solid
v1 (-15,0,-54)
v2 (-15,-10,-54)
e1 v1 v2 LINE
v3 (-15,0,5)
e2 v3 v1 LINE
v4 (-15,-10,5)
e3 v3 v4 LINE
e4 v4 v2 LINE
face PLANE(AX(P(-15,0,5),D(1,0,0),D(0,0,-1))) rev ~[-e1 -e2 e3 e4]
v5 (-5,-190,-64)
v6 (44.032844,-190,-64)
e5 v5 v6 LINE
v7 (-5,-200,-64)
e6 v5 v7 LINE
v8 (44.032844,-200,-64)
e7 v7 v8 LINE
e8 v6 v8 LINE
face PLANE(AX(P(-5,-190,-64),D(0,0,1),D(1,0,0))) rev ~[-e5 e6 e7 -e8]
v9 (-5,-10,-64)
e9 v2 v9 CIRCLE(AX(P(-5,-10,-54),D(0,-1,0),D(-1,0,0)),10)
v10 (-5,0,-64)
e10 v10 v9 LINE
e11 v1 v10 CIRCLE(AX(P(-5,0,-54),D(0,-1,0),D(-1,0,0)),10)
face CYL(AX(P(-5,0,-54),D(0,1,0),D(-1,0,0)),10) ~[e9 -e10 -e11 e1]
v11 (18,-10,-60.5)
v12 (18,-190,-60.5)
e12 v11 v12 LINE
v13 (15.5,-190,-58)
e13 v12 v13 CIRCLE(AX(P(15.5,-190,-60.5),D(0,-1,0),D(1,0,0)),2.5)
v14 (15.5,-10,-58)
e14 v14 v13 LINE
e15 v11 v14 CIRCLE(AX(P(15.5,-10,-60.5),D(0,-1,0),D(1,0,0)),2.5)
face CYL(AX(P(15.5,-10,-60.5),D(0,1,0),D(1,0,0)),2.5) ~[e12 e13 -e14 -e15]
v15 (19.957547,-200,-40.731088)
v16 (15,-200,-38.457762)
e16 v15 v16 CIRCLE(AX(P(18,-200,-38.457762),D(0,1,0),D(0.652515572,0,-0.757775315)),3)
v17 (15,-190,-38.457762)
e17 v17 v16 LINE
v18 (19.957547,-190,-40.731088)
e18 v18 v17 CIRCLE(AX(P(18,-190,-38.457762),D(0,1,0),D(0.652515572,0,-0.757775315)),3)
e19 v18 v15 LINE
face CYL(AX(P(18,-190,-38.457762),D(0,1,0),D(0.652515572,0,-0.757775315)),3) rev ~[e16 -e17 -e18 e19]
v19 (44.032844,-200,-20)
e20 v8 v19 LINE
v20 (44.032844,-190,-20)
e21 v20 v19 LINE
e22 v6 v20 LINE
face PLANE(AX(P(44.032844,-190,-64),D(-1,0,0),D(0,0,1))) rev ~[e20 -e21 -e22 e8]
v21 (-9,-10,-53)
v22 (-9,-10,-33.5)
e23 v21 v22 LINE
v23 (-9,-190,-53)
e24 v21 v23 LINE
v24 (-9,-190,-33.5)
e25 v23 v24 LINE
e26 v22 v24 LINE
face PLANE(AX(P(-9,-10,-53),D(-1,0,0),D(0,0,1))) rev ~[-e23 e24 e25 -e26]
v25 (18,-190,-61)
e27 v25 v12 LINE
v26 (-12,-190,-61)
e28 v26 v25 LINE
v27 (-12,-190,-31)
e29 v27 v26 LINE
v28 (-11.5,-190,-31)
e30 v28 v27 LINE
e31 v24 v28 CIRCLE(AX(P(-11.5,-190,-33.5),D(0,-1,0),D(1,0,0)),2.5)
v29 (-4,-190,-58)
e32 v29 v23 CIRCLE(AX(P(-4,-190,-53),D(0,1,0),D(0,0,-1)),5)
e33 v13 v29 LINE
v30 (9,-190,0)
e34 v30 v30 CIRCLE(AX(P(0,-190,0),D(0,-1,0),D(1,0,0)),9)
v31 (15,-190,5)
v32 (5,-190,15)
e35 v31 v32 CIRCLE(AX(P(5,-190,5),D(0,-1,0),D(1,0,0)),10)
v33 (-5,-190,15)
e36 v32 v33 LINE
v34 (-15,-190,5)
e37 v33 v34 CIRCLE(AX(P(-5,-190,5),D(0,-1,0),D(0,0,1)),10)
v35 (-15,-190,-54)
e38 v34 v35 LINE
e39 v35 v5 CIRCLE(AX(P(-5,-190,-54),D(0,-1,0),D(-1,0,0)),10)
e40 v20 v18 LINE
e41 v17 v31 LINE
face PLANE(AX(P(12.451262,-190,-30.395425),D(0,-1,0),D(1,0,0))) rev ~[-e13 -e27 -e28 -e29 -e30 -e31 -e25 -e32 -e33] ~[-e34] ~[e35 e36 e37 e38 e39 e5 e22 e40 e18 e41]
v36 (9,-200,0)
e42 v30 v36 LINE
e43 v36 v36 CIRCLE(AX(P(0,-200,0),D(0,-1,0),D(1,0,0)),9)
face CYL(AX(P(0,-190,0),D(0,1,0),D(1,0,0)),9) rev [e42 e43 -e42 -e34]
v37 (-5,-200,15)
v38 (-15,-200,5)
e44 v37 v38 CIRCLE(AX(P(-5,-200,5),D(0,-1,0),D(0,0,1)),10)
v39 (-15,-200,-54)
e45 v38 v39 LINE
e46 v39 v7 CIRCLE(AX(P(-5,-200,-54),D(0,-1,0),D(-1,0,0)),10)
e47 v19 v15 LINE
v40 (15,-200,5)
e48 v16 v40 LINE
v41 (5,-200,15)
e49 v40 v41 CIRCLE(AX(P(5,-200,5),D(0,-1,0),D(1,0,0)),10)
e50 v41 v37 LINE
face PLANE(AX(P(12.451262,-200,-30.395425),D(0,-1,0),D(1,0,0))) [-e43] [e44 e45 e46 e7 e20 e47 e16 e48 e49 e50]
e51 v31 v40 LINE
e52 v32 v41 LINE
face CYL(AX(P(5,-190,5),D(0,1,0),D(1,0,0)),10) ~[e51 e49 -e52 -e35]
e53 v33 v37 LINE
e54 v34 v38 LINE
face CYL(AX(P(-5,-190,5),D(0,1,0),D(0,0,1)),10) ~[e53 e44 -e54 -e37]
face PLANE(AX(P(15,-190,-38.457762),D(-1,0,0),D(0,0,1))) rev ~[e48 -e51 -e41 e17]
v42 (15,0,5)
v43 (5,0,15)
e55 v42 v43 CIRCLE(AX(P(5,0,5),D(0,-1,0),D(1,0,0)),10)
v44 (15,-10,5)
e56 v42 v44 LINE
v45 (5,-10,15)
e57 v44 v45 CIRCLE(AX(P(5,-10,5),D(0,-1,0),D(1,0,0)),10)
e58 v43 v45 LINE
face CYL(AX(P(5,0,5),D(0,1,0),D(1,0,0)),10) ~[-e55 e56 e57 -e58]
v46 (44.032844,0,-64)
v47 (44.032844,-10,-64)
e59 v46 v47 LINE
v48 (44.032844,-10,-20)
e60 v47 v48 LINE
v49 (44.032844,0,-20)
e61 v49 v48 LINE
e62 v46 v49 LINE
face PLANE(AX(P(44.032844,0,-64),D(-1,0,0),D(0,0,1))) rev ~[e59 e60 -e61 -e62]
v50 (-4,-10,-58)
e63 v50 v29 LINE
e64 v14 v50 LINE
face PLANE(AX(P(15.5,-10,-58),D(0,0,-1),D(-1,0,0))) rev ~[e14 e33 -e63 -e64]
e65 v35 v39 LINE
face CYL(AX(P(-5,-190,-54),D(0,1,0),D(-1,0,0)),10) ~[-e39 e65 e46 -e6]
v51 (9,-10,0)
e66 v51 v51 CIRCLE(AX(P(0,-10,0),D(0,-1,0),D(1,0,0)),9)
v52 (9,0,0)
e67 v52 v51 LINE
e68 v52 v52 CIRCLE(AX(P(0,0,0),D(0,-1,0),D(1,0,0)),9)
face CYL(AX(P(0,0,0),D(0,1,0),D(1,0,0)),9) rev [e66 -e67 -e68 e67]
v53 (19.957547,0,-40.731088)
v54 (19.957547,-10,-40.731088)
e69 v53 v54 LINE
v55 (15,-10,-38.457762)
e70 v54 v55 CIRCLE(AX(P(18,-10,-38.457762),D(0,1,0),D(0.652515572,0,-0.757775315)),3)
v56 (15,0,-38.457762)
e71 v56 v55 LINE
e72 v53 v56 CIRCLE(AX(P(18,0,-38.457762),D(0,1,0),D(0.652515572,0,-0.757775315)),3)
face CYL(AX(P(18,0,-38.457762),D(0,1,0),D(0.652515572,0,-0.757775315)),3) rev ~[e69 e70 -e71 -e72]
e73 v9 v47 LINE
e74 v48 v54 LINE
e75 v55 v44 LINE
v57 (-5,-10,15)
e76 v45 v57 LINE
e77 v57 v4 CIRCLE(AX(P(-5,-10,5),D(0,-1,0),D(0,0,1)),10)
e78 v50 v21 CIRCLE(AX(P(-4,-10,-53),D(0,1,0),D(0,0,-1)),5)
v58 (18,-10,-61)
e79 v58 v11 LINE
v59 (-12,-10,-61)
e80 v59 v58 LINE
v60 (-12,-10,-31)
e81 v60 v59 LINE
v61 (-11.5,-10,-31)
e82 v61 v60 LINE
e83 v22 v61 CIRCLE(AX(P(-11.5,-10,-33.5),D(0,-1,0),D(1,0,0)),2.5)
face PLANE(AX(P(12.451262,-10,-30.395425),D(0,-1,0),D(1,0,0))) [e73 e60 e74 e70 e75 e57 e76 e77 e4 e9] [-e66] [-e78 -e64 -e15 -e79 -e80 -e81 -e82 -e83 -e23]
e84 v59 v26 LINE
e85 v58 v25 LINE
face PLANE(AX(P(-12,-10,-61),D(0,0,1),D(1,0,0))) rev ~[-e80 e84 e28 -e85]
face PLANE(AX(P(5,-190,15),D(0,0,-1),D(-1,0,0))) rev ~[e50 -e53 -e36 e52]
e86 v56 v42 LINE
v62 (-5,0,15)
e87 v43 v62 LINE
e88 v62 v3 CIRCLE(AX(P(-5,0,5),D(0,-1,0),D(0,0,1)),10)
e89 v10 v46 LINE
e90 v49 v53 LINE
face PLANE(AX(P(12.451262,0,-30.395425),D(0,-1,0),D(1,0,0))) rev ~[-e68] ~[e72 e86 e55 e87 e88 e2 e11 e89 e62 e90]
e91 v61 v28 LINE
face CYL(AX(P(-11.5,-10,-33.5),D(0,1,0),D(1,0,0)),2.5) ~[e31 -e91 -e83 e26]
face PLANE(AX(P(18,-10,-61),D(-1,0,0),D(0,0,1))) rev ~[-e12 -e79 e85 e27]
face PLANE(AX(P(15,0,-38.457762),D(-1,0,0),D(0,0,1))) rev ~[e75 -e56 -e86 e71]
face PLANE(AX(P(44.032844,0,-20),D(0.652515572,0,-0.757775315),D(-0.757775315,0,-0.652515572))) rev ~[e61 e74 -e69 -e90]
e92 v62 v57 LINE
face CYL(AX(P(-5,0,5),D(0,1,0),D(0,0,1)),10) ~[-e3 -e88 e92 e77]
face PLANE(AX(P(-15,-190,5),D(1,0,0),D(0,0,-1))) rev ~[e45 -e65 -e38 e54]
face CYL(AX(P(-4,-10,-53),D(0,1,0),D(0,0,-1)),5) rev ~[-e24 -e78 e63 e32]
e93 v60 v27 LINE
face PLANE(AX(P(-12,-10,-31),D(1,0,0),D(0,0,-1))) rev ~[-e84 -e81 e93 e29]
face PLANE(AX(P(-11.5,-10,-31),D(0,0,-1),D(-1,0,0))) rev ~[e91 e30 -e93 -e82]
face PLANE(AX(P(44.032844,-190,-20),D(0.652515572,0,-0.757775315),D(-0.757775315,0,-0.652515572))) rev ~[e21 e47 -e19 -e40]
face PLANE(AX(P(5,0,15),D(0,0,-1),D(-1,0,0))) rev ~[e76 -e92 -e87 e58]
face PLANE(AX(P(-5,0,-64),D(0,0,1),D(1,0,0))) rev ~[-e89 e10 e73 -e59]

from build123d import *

# Parameters (mm, degrees)
F0_R     = 9
F1_DEPTH = 10
F7_DEPTH = 180
F8_R     = 9
F9_DEPTH = 10


# Not quite as in the source:
# - a feature of the source that left no trace in its solid (it failed there, or was rolled back) is left out


with BuildPart() as f1:
    # F0 (on Front) → F1 (new body)
    with BuildSketch(Plane.XZ):
        with BuildLine():
            Line((5, 15), (-5, 15))
            ThreePointArc((-5, 15), (-12.0710678119, 12.0710678119), (-15, 5))
            Line((-15, 5), (-15, -54))
            ThreePointArc((-15, -54), (-12.0710678119, -61.0710678119), (-5, -64))
            Line((-5, -64), (44.0328441188, -64))
            Line((44.0328441188, -64), (44.0328441188, -20))
            Line((44.0328441188, -20), (19.9575467156, -40.731087613))
            ThreePointArc((19.9575467156, -40.731087613), (16.7495281184, -41.1847233597), (15, -38.4577616671))
            Line((15, -38.4577616671), (15, 5))
            ThreePointArc((15, 5), (12.0710678119, 12.0710678119), (5, 15))
        make_face()
        Circle(F0_R, mode=Mode.SUBTRACT)
    extrude(amount=F1_DEPTH)

    # F6 (on face) → F7 (join)
    with BuildSketch(Plane.XZ.offset(10)):
        with BuildLine():
            Line((-12, -61), (18, -61))
            Line((18, -61), (18, -60.5))
            ThreePointArc((18, -60.5), (17.267766953, -58.732233047), (15.5, -58))
            Line((15.5, -58), (-4, -58))
            ThreePointArc((-4, -58), (-7.5355339059, -56.5355339059), (-9, -53))
            Line((-9, -53), (-9, -33.5))
            ThreePointArc((-9, -33.5), (-9.732233047, -31.732233047), (-11.5, -31))
            Line((-11.5, -31), (-12, -31))
            Line((-12, -31), (-12, -61))
        make_face()
    extrude(amount=F7_DEPTH)

    # F8 (on face) → F9 (join)
    with BuildSketch(Plane.XZ.offset(190)):
        with BuildLine():
            Line((5, 15), (-5, 15))
            ThreePointArc((-5, 15), (-12.0710678119, 12.0710678119), (-15, 5))
            Line((-15, 5), (-15, -54))
            ThreePointArc((-15, -54), (-12.0710678119, -61.0710678119), (-5, -64))
            Line((-5, -64), (44.0328441188, -64))
            Line((44.0328441188, -64), (44.0328441188, -20))
            Line((44.0328441188, -20), (19.9575467156, -40.731087613))
            ThreePointArc((19.9575467156, -40.731087613), (16.7495281184, -41.1847233597), (15, -38.4577616671))
            Line((15, -38.4577616671), (15, 5))
            ThreePointArc((15, 5), (12.0710678119, 12.0710678119), (5, 15))
        make_face()
        Circle(F8_R, mode=Mode.SUBTRACT)
    extrude(amount=F9_DEPTH)


solid = f1.part
